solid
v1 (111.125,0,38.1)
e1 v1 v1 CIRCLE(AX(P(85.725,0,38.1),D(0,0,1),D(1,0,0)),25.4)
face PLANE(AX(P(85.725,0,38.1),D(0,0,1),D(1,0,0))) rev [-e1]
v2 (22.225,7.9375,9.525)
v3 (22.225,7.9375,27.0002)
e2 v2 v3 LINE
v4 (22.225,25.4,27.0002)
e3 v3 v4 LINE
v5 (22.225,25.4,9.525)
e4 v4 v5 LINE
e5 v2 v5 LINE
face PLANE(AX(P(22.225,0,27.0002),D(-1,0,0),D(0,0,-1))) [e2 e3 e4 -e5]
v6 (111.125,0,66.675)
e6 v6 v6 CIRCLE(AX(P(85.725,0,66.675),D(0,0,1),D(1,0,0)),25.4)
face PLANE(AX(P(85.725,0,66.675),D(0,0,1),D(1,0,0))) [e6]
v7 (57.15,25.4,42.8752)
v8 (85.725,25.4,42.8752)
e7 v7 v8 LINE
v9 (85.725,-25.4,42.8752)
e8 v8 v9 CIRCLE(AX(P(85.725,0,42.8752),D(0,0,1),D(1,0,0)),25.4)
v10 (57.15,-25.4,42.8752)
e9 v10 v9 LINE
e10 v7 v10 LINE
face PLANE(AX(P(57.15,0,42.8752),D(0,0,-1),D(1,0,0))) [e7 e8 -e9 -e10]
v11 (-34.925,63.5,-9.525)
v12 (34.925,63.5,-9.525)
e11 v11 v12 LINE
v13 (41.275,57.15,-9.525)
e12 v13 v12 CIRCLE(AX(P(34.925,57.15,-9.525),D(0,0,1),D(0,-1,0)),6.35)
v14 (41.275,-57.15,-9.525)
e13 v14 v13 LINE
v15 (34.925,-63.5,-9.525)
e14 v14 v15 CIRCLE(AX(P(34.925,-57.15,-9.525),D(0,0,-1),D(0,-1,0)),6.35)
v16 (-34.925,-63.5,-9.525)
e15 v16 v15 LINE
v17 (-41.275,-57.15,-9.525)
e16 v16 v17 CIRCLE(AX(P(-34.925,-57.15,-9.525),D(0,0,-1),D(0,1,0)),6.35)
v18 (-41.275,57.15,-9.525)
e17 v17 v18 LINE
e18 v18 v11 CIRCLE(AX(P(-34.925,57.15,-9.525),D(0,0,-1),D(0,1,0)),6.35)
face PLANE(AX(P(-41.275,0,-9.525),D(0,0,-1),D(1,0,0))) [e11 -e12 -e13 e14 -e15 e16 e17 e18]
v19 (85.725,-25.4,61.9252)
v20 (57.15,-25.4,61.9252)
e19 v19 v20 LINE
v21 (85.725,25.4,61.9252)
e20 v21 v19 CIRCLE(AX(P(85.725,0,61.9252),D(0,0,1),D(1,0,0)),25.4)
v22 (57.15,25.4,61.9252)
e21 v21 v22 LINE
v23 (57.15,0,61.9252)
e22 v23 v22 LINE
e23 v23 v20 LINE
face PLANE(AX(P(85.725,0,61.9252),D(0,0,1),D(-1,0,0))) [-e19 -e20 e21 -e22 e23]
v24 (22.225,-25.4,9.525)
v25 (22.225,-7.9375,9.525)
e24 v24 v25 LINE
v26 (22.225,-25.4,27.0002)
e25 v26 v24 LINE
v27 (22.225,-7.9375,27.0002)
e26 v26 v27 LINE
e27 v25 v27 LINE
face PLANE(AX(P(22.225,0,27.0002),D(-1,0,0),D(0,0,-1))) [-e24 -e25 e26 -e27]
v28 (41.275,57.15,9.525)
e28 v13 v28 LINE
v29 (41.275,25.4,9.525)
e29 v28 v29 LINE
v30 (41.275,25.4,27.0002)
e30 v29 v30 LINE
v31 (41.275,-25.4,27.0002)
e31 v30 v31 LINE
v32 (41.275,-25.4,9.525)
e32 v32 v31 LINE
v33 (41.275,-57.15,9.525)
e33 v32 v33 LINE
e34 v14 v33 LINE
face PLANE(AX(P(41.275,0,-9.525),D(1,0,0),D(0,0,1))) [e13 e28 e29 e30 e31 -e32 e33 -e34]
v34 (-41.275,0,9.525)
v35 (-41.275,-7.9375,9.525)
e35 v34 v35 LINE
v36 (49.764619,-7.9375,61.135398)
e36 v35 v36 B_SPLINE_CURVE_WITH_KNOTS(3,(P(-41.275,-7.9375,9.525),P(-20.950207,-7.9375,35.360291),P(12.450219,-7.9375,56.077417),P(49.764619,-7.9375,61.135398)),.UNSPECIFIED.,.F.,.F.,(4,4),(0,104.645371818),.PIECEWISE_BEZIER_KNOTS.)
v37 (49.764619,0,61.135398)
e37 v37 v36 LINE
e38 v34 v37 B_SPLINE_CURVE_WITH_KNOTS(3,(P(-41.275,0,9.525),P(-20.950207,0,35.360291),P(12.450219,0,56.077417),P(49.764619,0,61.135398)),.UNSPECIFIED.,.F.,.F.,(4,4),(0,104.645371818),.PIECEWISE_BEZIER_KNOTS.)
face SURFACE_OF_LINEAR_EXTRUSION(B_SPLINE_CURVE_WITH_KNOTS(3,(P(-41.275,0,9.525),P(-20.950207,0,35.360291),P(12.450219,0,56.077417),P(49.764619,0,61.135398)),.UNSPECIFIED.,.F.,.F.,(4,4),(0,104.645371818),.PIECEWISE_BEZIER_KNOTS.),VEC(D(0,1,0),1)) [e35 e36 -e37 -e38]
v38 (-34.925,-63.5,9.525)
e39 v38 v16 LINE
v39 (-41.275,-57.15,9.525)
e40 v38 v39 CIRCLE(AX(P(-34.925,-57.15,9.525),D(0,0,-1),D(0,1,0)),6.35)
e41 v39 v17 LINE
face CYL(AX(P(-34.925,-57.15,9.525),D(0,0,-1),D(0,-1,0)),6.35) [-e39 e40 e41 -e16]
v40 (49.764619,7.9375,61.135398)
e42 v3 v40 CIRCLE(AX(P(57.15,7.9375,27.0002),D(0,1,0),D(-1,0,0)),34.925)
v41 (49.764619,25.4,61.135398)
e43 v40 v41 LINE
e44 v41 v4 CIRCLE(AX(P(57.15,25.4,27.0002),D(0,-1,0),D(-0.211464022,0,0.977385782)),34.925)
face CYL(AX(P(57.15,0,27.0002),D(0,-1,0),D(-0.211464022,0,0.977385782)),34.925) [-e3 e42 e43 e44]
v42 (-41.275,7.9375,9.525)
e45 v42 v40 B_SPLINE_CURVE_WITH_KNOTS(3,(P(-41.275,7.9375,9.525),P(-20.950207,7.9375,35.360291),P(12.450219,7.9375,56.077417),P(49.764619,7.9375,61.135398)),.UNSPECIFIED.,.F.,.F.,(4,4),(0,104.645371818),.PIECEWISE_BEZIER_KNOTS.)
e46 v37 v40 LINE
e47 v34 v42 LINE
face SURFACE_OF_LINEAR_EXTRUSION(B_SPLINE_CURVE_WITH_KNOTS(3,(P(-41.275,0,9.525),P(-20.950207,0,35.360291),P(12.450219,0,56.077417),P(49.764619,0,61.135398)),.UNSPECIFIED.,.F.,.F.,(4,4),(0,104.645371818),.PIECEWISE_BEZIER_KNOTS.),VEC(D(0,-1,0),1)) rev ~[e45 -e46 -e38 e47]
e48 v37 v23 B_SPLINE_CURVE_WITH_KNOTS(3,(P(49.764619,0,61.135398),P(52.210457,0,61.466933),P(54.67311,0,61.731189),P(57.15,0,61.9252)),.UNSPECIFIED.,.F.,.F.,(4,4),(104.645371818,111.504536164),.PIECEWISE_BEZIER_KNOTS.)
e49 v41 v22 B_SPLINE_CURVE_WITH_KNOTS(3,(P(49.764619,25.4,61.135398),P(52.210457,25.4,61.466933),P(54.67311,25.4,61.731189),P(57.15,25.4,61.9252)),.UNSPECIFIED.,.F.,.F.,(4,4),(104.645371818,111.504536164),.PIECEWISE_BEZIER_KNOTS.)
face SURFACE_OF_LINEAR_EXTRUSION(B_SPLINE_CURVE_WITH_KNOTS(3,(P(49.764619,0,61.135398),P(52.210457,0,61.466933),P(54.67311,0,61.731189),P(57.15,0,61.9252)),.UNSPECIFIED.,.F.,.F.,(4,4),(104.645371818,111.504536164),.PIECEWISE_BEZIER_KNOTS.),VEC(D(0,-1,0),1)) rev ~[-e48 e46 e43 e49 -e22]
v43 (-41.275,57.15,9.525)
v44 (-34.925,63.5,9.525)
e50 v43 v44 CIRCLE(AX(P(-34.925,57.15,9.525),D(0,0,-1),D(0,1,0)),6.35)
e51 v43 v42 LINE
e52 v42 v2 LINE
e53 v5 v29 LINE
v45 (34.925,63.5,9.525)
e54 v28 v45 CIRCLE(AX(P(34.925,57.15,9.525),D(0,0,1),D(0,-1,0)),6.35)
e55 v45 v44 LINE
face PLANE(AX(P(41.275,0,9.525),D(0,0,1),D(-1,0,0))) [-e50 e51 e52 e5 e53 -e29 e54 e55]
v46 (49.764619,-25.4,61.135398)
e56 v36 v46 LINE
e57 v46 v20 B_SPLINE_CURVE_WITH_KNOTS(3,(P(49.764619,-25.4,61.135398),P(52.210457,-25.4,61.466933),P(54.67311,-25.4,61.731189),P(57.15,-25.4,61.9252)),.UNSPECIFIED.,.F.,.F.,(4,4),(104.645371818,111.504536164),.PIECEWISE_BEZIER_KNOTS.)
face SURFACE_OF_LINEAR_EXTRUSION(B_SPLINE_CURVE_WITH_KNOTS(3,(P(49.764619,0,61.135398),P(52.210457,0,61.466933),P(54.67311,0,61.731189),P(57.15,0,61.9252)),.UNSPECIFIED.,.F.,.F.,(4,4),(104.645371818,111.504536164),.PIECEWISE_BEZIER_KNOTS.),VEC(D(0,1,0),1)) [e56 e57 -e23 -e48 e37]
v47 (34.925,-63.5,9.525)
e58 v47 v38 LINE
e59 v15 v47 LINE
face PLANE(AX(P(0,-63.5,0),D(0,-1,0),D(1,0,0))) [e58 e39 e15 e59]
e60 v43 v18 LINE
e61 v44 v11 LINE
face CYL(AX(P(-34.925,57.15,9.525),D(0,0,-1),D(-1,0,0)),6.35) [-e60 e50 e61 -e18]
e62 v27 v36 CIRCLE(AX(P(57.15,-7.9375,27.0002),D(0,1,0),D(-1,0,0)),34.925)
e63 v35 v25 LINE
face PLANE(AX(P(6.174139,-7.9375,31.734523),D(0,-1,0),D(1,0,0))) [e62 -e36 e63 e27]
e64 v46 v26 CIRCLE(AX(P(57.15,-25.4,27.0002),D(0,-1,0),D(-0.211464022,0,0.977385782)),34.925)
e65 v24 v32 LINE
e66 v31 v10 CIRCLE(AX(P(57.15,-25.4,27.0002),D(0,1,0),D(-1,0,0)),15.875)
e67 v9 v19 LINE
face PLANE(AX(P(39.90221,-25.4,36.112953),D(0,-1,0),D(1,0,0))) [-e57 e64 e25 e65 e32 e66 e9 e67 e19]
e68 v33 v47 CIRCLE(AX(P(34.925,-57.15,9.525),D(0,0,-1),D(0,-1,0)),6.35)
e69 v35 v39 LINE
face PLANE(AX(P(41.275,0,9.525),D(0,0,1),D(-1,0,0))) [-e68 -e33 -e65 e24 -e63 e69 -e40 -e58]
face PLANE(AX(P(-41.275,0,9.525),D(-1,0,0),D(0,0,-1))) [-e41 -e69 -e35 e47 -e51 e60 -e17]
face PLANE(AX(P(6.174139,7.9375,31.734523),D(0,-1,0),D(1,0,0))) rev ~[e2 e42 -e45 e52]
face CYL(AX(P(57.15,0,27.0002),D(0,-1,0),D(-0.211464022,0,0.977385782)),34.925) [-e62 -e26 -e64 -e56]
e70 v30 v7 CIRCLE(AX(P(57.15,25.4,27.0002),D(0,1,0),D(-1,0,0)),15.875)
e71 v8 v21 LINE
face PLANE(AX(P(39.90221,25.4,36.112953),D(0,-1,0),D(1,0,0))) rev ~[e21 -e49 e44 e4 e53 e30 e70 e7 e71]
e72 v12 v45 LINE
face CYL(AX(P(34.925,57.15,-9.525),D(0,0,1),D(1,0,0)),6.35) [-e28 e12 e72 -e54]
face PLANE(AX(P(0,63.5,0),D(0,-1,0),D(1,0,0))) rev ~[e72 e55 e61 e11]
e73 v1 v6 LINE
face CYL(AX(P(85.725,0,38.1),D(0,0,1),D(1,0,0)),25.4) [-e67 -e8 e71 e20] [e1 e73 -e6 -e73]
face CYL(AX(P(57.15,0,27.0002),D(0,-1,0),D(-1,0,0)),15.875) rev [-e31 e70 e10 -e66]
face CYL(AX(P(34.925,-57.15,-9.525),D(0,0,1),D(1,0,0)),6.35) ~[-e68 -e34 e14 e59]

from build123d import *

# Parameters (mm, degrees)
F1_DEPTH = 63.5
F0_W     = 25.4
F0_H     = 19.05
F2_DEPTH = 25.4
F3_DEPTH = 7.9375
F5_R     = 6.35


# Not quite as in the source:
# - a feature names something its author has since deleted; it is built from what else it names


with BuildPart() as f1:
    # F0 (on Front) → F1 (new body, symmetric)
    with BuildSketch(Plane.XZ):
        Polygon((41.275, -9.525), (41.275, 9.525), (22.225, 9.525), (-41.275, 9.525), (-41.275, -9.525), align=None)
    extrude(amount=F1_DEPTH, both=True)

    # F0 (on Front) → F2 (join, symmetric)
    with BuildSketch(Plane.XZ):
        with BuildLine():
            Line((22.225, 9.525), (41.275, 9.525))
            Line((41.275, 9.525), (41.275, 27.0002))
            ThreePointArc((41.275, 27.0002), (45.9246798487, 38.2255201513), (57.15, 42.8752))
            Line((57.15, 42.8752), (60.325, 42.8752))
            Line((60.325, 42.8752), (60.325, 61.9252))
            Line((60.325, 61.9252), (57.15, 61.9252))
            add(Edge.make_bspline(
                [(49.7646190409, 61.1353984481), (52.2104568014, 61.4669327128), (54.6731104701, 61.7311893911), (57.15, 61.9252)],
                knots=[104.645371818, 104.645371818, 104.645371818, 104.645371818, 111.5045361635, 111.5045361635, 111.5045361635, 111.5045361635], degree=3))
            ThreePointArc((49.7646190409, 61.1353984481), (29.9682960891, 48.9298739032), (22.225, 27.0002))
            Line((22.225, 27.0002), (22.225, 9.525))
        make_face()
        with Locations((73.025, 52.4002)):
            Rectangle(F0_W, F0_H)
    extrude(amount=F2_DEPTH, both=True)

    # F0 (on Front) → F3 (join, symmetric)
    with BuildSketch(Plane.XZ):
        with BuildLine():
            Line((-41.275, 9.525), (22.225, 9.525))
            Line((22.225, 9.525), (22.225, 27.0002))
            ThreePointArc((22.225, 27.0002), (29.9682960891, 48.9298739032), (49.7646190409, 61.1353984481))
            add(Edge.make_bspline(
                [(-41.275, 9.525), (-20.9502066659, 35.3602907495), (12.4502190704, 56.0774169419), (49.7646190409, 61.1353984481)],
                knots=[0, 0, 0, 0, 104.645371818, 104.645371818, 104.645371818, 104.645371818], degree=3))
        make_face()
    extrude(amount=F3_DEPTH, both=True)

    # F0 (on Front) → F4 (revolve)
    with BuildSketch(Plane.XZ):
        Polygon((85.725, 61.9252), (85.725, 42.8752), (85.725, 38.1), (111.125, 38.1), (111.125, 66.675), (85.725, 66.675), align=None)
    revolve(axis=Axis((85.725, 0, 52.3875), (0, 0, 1)))

    # F5
    f5_edges = [f1.edges().sort_by_distance(p)[0] for p in [
        (41.275, -63.5, 0),
        (41.275, 63.5, 0),
        (-41.275, 63.5, 0),
        (-41.275, -63.5, 0),
    ]]
    fillet(f5_edges, radius=F5_R)


solid = f1.part
